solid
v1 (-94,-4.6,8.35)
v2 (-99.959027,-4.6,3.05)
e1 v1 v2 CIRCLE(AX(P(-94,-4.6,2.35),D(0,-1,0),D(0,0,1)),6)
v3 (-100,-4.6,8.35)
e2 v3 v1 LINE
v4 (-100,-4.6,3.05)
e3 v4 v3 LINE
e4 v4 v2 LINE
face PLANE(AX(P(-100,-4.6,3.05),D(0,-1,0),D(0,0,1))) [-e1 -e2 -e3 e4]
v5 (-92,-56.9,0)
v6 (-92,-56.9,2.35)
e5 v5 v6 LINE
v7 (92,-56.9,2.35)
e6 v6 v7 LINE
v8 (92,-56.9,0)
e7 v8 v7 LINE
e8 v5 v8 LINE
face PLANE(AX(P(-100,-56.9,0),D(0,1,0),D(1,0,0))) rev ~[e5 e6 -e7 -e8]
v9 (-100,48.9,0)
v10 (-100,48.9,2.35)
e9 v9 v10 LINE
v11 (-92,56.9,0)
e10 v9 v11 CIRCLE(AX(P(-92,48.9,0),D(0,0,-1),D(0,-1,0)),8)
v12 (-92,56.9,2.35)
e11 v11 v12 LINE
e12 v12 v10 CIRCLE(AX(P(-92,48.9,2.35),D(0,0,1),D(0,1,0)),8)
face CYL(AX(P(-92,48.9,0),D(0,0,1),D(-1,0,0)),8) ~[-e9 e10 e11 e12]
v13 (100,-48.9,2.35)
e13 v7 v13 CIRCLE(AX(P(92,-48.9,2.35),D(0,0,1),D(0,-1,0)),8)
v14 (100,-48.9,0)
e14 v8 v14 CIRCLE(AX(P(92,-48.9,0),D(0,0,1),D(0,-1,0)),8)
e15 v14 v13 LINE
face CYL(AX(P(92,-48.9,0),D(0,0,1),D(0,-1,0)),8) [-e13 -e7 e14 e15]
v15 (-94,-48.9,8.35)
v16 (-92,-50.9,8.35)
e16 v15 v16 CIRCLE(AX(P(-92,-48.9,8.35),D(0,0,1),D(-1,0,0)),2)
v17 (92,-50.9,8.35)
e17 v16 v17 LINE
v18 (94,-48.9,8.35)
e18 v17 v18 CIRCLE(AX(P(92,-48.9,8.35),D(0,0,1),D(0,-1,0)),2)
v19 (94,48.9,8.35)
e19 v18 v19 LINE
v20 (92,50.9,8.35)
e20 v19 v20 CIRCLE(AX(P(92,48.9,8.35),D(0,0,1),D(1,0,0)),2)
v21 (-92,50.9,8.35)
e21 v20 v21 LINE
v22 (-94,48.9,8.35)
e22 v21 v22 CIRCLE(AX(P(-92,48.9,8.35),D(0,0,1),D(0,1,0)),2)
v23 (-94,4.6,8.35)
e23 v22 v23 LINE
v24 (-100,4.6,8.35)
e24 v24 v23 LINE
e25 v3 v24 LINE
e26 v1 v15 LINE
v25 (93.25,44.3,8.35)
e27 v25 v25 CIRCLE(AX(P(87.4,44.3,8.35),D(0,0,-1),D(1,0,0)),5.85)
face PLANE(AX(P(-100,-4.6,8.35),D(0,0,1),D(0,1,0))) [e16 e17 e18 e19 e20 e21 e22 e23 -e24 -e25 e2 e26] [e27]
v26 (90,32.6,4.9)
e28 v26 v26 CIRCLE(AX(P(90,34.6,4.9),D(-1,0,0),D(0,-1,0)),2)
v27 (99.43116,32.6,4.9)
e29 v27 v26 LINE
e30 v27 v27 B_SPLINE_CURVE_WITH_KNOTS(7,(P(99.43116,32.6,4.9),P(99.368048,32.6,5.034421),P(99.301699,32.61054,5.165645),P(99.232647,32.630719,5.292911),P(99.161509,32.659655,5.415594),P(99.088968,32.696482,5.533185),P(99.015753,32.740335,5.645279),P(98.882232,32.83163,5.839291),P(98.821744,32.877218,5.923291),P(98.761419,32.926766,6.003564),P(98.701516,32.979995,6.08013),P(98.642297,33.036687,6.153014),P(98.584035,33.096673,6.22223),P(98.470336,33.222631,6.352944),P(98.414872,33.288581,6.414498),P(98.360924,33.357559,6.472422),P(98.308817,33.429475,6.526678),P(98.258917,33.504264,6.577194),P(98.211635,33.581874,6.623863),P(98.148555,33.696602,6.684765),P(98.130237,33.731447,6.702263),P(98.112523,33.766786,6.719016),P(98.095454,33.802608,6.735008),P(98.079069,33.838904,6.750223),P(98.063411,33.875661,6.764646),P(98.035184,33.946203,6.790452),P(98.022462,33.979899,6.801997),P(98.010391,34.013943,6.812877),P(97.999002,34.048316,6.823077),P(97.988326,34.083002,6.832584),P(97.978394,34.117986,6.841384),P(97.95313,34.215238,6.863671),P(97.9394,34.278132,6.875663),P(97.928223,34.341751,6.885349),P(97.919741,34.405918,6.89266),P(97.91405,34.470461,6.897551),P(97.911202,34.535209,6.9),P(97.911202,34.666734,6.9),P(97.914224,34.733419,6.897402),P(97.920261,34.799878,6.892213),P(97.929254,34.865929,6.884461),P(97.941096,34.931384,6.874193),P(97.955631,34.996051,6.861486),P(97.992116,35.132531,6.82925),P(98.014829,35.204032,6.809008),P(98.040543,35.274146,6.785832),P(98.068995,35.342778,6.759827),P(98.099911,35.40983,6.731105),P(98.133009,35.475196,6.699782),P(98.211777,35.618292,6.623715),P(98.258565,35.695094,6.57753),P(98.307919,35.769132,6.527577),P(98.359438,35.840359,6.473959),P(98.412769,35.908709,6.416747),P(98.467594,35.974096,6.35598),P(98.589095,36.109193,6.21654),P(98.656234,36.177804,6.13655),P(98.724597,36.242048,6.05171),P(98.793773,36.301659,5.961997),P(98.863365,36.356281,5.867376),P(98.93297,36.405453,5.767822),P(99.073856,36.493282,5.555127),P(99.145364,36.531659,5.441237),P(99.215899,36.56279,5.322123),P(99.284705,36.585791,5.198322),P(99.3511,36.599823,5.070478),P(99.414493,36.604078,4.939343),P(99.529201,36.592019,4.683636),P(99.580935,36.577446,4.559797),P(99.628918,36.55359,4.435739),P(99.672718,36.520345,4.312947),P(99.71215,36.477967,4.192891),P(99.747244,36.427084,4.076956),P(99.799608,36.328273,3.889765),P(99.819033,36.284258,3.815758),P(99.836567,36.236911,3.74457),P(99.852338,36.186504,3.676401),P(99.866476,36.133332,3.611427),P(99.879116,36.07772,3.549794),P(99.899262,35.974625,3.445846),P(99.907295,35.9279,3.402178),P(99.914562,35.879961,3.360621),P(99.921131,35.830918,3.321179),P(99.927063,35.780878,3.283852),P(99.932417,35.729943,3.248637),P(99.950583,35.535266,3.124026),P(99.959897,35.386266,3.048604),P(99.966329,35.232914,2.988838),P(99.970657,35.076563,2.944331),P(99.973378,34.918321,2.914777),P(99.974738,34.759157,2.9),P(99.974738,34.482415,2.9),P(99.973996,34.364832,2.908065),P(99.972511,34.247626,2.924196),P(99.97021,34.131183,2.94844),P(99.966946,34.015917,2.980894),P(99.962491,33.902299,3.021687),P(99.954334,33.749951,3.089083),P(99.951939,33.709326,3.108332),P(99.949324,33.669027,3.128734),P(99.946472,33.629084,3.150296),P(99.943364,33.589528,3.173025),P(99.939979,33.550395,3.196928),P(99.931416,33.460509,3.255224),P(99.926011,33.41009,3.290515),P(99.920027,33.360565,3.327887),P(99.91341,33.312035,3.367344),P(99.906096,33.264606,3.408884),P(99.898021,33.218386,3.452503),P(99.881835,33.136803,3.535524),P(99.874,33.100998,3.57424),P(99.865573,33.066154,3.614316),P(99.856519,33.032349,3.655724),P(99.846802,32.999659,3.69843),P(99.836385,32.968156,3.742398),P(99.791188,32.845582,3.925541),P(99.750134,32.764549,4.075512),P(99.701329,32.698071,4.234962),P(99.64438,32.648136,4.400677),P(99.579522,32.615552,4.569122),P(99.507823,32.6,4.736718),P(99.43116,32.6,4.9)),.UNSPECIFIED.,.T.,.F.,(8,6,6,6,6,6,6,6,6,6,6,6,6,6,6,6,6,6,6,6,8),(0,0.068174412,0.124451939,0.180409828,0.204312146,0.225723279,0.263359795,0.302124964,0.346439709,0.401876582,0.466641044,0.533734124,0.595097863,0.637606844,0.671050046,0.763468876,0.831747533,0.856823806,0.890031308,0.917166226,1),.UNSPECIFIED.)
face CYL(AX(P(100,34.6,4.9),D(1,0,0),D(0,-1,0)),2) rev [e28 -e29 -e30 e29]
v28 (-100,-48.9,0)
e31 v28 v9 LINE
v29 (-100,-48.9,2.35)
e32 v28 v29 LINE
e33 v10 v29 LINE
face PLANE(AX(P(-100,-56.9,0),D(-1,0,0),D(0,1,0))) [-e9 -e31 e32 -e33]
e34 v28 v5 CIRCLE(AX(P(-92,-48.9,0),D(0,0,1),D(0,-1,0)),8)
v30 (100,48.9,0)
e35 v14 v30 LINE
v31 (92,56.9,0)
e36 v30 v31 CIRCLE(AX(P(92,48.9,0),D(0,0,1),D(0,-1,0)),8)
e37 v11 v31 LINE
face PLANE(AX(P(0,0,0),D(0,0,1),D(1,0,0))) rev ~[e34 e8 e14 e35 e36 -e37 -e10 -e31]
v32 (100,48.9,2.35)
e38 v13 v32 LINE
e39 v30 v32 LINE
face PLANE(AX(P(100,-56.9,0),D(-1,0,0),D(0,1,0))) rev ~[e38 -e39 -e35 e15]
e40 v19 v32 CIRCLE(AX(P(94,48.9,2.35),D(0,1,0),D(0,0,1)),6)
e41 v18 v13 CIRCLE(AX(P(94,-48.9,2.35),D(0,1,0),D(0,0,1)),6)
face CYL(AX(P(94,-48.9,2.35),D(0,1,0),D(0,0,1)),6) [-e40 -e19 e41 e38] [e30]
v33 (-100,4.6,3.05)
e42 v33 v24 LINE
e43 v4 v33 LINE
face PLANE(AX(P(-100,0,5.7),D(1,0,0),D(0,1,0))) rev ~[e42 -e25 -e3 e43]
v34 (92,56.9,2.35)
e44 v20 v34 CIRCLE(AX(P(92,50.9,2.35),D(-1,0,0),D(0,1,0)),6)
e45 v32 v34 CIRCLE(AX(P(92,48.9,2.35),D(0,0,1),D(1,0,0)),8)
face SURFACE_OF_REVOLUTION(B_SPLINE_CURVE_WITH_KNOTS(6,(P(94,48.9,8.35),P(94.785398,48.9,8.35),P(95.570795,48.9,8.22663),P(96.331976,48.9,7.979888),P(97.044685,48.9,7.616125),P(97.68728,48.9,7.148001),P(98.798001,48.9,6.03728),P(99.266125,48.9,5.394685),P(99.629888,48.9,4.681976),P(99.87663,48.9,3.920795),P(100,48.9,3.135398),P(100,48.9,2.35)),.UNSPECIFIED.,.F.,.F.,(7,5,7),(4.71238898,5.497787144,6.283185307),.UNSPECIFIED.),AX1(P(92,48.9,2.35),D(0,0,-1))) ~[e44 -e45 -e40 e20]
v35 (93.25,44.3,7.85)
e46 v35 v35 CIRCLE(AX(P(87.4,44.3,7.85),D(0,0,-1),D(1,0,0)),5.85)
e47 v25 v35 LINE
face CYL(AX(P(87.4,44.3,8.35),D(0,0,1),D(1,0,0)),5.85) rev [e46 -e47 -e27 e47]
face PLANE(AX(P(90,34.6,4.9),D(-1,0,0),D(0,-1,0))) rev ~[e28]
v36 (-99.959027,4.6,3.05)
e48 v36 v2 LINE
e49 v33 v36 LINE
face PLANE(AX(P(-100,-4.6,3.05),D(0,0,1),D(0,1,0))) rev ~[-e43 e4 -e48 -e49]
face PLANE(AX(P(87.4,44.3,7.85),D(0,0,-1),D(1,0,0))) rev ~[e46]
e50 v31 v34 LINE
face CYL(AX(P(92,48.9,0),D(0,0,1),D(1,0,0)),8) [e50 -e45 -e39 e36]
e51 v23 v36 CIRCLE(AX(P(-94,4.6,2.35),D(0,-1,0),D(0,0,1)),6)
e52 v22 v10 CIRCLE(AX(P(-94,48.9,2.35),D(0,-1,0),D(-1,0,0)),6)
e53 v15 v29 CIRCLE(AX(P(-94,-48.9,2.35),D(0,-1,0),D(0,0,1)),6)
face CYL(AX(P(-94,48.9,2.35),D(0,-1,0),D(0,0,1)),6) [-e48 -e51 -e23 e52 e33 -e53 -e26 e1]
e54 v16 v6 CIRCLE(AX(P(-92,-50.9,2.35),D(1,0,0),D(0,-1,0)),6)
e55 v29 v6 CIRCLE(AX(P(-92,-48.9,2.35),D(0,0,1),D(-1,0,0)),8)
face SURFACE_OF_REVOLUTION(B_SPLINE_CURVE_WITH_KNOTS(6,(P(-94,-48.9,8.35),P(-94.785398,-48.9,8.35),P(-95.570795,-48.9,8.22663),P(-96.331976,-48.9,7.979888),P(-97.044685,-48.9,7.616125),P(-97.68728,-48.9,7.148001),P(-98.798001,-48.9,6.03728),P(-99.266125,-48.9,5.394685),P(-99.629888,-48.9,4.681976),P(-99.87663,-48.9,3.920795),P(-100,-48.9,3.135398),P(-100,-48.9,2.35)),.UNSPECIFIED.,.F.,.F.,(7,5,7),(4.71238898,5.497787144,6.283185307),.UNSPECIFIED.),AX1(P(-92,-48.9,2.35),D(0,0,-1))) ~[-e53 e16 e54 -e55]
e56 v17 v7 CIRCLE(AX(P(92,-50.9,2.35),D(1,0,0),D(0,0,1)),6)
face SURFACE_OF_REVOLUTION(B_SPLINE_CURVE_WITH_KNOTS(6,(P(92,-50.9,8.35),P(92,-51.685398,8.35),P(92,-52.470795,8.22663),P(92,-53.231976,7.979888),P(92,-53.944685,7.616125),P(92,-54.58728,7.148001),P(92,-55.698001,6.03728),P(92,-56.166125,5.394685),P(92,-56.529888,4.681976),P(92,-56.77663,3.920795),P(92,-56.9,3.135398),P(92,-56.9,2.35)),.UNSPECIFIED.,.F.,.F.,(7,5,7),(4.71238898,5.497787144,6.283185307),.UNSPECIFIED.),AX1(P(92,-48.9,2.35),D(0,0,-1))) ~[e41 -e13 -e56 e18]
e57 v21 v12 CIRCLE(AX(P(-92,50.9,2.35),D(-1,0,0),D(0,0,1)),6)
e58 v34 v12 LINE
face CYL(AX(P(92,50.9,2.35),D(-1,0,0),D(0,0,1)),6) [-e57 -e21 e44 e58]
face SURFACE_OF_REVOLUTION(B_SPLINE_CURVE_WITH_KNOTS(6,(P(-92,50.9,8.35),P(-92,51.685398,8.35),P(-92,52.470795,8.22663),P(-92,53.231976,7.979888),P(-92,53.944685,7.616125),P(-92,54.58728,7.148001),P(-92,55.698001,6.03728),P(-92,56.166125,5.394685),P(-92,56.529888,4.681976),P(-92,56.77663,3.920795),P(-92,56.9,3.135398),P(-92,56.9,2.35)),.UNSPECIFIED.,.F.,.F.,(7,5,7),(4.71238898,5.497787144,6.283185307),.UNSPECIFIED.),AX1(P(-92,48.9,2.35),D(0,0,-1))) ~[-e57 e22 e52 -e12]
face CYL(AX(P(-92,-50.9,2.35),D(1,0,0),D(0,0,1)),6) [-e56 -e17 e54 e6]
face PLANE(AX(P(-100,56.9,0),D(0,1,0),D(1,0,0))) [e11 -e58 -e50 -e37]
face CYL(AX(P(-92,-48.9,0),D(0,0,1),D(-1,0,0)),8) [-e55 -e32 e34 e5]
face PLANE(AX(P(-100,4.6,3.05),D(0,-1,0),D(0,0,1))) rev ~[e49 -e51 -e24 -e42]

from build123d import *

# Parameters (mm, degrees)
F0_W      = 200
F0_H      = 113.8
F1_DEPTH  = 8.35
F2_R      = 8
F3_R      = 6
F5_R      = 5.85
F6_DEPTH  = 0.5
F8_R      = 2
F9_DEPTH  = 10
F12_W     = 9.2
F12_H     = 5.3
F13_DEPTH = 25


with BuildPart() as f1:
    # F0 (on Top) → F1 (new body)
    with BuildSketch(Plane.XY):
        Rectangle(F0_W, F0_H)
    extrude(amount=F1_DEPTH)

    # F2
    f2_edges = [f1.edges().sort_by_distance(p)[0] for p in [
        (-100, -56.9, 4.175),
        (100, -56.9, 4.175),
        (-100, 56.9, 4.175),
        (100, 56.9, 4.175),
    ]]
    fillet(f2_edges, radius=F2_R)

    # F3
    f3_edges = [f1.edges().sort_by_distance(p)[0] for p in [
        (100, 0, 8.35),
        (97.656854, -54.556854, 8.35),
        (97.656854, 54.556854, 8.35),
        (0, -56.9, 8.35),
        (0, 56.9, 8.35),
        (-97.656854, -54.556854, 8.35),
        (-97.656854, 54.556854, 8.35),
    ]]
    fillet(f3_edges, radius=F3_R)

    # F5 (on face) → F6 (cut)
    with BuildSketch(Plane(origin=(0, 0, 8.35), x_dir=(1, 0, 0), z_dir=(0, 0, -1))):
        with Locations((87.4, -44.3)):
            Circle(F5_R)
    extrude(amount=F6_DEPTH, mode=Mode.SUBTRACT)

    # F8 (on face) → F9 (cut)
    with BuildSketch(Plane(origin=(100, 0, 0), x_dir=(0, -1, 0), z_dir=(-1, 0, 0))):
        with Locations((-34.6, 4.9)):
            Circle(F8_R)
    extrude(amount=F9_DEPTH, mode=Mode.SUBTRACT)

    # F12 (on face) → F13 (join)
    with BuildSketch(Plane.YZ.offset(-100)):
        with Locations((0, 5.7)):
            Rectangle(F12_W, F12_H)
    extrude(amount=F13_DEPTH)


solid = f1.part
